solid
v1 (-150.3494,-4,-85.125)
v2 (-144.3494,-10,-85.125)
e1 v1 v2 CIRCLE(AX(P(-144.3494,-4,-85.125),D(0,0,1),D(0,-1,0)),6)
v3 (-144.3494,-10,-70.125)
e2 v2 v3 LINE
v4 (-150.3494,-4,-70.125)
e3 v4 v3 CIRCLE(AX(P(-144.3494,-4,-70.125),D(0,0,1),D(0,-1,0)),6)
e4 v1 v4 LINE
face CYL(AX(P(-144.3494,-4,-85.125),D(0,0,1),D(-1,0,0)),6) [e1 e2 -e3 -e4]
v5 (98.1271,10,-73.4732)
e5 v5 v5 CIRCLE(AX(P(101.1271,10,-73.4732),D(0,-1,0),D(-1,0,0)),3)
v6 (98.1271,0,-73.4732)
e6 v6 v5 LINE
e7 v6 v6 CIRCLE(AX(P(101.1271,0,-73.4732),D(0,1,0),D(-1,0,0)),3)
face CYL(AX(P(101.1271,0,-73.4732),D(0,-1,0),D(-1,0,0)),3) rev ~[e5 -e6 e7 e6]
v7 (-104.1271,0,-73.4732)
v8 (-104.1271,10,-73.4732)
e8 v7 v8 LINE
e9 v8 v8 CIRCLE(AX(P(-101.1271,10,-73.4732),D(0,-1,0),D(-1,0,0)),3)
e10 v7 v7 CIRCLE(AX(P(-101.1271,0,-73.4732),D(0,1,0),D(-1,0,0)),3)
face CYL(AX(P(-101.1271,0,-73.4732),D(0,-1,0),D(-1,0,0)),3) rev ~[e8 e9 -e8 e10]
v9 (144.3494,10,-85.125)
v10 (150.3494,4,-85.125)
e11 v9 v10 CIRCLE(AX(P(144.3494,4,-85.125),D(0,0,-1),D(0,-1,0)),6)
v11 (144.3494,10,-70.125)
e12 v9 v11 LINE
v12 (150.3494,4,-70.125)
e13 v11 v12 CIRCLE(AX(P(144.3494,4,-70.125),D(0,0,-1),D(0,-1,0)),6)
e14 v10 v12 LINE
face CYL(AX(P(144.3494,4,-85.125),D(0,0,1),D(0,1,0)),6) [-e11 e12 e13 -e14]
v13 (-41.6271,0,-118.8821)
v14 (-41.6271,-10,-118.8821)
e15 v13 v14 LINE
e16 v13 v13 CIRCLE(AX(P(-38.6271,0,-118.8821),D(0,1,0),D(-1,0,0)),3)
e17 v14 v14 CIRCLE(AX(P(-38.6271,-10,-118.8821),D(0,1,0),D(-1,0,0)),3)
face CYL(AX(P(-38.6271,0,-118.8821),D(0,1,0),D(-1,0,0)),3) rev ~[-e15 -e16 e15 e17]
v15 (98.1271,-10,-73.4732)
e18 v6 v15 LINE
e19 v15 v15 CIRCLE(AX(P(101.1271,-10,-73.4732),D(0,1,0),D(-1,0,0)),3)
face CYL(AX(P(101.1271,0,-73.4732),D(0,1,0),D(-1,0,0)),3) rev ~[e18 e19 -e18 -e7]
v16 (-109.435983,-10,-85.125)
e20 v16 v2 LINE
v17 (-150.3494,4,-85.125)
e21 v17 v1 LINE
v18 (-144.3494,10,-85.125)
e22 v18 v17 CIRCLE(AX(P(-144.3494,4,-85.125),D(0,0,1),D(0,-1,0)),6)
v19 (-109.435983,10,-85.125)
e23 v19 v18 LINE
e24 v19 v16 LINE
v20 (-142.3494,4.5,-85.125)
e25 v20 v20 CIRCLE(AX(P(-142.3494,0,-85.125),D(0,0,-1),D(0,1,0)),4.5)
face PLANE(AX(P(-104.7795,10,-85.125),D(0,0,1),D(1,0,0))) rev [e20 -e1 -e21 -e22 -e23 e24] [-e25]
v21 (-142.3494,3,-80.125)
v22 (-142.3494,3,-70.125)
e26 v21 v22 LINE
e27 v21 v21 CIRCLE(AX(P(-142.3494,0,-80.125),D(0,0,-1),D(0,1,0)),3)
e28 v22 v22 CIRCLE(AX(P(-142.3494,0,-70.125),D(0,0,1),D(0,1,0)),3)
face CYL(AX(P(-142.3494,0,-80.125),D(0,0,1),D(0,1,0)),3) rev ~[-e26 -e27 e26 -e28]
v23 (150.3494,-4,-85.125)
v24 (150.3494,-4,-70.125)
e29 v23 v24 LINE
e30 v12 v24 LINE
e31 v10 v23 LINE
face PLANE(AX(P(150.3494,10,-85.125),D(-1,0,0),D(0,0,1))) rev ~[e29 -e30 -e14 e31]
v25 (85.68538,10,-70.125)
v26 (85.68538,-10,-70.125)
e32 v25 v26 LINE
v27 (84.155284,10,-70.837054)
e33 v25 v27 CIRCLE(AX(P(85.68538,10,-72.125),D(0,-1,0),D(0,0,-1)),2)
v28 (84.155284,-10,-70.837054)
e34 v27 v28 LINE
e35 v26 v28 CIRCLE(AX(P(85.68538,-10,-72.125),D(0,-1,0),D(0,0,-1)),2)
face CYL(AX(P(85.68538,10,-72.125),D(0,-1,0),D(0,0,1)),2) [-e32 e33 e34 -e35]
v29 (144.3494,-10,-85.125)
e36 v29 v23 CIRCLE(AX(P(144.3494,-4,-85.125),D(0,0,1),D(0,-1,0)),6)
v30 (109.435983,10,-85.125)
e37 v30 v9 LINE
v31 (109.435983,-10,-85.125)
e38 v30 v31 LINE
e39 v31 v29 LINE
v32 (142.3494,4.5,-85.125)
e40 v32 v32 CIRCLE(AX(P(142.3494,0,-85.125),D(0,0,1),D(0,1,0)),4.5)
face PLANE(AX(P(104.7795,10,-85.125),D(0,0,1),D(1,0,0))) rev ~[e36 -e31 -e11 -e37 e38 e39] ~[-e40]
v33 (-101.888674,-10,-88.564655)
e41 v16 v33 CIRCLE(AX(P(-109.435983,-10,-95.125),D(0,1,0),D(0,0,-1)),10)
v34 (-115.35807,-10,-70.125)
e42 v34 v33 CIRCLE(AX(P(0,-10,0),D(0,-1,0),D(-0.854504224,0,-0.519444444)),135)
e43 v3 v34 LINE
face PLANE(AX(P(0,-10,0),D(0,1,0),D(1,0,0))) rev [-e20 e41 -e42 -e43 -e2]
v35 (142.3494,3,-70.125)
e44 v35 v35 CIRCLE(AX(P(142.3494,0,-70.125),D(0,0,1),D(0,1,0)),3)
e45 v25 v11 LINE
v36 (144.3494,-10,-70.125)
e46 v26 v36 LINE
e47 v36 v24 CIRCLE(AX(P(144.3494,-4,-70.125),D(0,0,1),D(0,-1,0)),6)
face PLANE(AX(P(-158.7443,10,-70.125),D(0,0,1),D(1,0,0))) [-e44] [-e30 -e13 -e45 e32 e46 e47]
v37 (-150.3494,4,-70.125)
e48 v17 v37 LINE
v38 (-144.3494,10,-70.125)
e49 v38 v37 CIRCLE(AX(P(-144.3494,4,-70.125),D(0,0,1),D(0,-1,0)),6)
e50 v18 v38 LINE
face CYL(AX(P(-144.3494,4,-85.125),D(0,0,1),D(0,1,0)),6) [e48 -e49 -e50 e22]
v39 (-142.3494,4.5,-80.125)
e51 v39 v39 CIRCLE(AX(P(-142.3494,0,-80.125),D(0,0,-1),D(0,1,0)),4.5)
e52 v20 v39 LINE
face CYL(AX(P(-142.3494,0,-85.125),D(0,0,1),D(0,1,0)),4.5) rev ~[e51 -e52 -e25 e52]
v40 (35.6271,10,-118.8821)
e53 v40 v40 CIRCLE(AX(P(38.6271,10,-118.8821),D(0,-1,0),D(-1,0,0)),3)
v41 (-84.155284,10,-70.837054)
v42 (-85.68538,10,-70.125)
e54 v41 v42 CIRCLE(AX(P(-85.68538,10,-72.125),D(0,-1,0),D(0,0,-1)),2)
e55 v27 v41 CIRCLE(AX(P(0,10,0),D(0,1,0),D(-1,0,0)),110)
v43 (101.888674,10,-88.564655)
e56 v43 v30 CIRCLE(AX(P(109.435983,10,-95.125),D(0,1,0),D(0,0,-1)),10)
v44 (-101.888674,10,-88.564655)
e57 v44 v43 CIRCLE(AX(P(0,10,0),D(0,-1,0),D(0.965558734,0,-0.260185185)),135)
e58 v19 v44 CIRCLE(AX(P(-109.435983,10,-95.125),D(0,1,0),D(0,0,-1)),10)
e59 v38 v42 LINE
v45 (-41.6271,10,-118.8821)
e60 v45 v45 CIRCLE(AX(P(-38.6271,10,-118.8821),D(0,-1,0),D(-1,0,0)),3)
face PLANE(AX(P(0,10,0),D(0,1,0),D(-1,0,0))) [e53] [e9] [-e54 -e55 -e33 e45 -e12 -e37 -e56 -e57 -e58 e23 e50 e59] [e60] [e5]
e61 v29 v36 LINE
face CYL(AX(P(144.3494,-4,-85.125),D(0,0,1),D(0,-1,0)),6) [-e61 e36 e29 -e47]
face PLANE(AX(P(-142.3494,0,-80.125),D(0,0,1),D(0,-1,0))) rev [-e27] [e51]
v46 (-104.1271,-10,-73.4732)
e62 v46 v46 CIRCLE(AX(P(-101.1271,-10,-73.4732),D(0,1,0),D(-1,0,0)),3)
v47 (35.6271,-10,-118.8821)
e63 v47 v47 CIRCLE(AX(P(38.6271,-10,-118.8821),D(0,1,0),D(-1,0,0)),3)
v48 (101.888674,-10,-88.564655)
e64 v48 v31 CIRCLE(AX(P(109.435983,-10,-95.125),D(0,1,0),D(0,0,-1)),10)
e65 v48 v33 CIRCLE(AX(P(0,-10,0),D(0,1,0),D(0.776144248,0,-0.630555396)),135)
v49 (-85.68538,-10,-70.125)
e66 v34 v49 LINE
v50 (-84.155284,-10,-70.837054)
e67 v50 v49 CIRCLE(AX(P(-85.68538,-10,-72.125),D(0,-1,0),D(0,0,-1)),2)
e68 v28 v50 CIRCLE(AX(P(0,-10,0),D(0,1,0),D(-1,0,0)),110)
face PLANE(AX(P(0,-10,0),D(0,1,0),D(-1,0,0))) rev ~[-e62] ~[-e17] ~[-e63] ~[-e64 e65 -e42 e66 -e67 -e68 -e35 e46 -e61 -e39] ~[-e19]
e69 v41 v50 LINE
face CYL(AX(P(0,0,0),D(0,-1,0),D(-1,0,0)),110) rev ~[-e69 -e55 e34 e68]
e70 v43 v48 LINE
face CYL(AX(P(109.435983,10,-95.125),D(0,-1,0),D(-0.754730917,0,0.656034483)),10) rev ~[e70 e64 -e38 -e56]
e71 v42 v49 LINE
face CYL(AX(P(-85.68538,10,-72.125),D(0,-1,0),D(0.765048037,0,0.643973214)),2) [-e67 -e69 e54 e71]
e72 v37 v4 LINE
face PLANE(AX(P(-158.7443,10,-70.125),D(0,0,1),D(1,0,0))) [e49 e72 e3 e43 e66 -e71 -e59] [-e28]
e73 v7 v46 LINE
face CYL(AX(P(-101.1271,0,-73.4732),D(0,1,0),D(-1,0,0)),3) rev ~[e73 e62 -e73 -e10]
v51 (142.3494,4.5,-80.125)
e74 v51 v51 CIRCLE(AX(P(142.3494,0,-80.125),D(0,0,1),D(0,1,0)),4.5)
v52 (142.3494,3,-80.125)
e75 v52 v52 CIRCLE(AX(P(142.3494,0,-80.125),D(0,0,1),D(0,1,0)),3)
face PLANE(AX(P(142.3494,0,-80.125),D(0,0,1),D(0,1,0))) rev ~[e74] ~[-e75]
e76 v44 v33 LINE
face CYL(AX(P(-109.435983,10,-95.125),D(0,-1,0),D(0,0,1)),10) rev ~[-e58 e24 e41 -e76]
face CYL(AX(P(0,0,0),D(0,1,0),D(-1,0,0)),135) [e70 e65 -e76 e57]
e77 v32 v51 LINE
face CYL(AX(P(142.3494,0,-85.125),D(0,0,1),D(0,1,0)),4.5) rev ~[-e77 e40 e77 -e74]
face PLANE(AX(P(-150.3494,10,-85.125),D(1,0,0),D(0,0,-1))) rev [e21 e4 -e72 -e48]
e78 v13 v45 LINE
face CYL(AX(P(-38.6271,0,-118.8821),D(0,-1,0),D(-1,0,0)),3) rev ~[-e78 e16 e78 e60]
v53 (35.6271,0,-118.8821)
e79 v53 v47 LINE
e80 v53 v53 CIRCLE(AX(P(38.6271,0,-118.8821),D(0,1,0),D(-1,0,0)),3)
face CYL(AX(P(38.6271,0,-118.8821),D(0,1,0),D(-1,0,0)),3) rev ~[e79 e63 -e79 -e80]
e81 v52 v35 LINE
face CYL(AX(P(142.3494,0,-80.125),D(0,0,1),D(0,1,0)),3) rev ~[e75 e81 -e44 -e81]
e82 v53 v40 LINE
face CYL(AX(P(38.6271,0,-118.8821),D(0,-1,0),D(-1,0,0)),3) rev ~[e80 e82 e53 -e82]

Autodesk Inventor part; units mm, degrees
ref_plane "YZ Plane" through (0, 0, 0) normal (1, 0, 0) x (0, 1, 0)
ref_plane "XZ Plane" through (0, 0, 0) normal (0, 1, 0) x (-1, 0, 0)
ref_plane "XY Plane" through (0, 0, 0) normal (0, 0, 1) x (1, 0, 0)
sketch "Sketch1" plane through (0, 0, 0) normal (0, 1, 0) x (-1, 0, 0)
  circle A0 centre (0, 0) radius 135
  circle A1 centre (0, 0) radius 110
  circle A2 centre (0, 0) radius 125
  circle A3 centre (-125, 0) radius 3
  circle A4 centre (-101.1271, -73.4732) radius 3
  circle A5 centre (-38.6271, -118.8821) radius 3
  circle A6 centre (38.6271, -118.8821) radius 3
  circle A7 centre (101.1271, -73.4732) radius 3
  circle A8 centre (125, 0) radius 3
  circle A9 centre (101.1271, 73.4732) radius 3
  circle A10 centre (38.6271, 118.8821) radius 3
  circle A11 centre (-38.6271, 118.8821) radius 3
  circle A12 centre (-101.1271, 73.4732) radius 3
  dimension "d69" = 250
  dimension "d0" = 270
  dimension "d1" = 220
  dimension "d75" = 6
  dimension "d78" = 360
extrude "Extrusion1" add sketch "Sketch1" along normal mid plane 20 contours A0 | A8 A2 A7 A6 A5 A4 A3 A12 A11 A10 A9
sketch "Sketch4" plane through (0, 10, 0) normal (0, 1, 0) x (1, 0, 0)
  circle A0 centre (0, 0) radius 50.125
  circle A1 centre (0, 0) radius 135 projected
  circle A2 centre (0, 0) radius 110 projected
  line L0 (125.3494, 50.125) -> (150.3494, 50.125)
  line L1 (150.3494, 50.125) -> (150.3494, 35.125)
  line L2 (150.3494, 35.125) -> (125.3494, 35.125)
  line L3 (125.3494, 35.125) -> (125.3494, 50.125)
  line L4 (150.3494, 70.125) -> (104.7795, 70.125)
  line L5 (104.7795, 70.125) -> (104.7795, 85.125)
  line L6 (104.7795, 85.125) -> (150.3494, 85.125)
  line L7 (150.3494, 85.125) -> (150.3494, 70.125)
  line L8 (103.1497, 60.125) -> (138.3886, 60.125) construction
  point P0 (130.3504, 35.125)
  point P1 (115.3581, 70.125)
  dimension "d21" = 100.25
  dimension "d22" = 25
  dimension "d23" = 15
  dimension "d24" = 20
  dimension "d25" = 15
  dimension "d57" = 10
extrude "Extrusion3" add sketch "Sketch4" against normal up to surface (20 mm away) contours L6 L7 L4 A1 | A1 L0 L1 L2
fillet "Fillet1" radius 6 4 edges at (150.3494, 10, -77.625) (150.3494, -10, -77.625) (150.3494, -10, -42.625) (150.3494, 10, -42.625)
fillet "Fillet2" radius 10 1 edges at (104.7795, 0, -85.125)
fillet "Fillet3" radius 2 1 edges at (130.3504, 0, -35.125)
sketch "Sketch5" plane through (150.3494, -4, -85.125) normal (0, 0, -1) x (-1, 0, 0)
  line L0 (0, 8) -> (0, 0) projected
  line L1 (40.9135, -6) -> (6, -6) projected
  point P0 (150.3494, 4)
  point P1 (8, 4)
  point P2 (0, 4)
  dimension "d38" = 8
  dimension "d39" = 10
hole "Hole2" at (142.3494, 0, -85.125) direction (0, 0, 1) diameter 6 depth 50 counterbore diameter 9 counterbore depth 5
mirror "Mirror1" about plane through (0, 0, 0) normal (1, 0, 0) of "Extrusion3", "Fillet1", "Fillet2", "Fillet3", "Hole2"
mirror "Mirror2" about plane through (0, 0, 0) normal (0, 0, 1) of "Extrusion3", "Fillet1", "Fillet2", "Fillet3", "Hole2"
sketch "Sketch7" plane through (0, 10, 0) normal (0, 1, 0) x (1, 0, 0)
  line L0 (0, 0) -> (0, -158.0698) construction
  point P0 (0, -127.5)
  dimension "d50" = 127.5
hole "Hole3" at (0, 10, 127.5) direction (0, -1, 0) diameter 5 end through all
sketch "Sketch11" plane through (0, 10, 0) normal (0, 1, 0) x (1, 0, 0)
  line L0 (-158.7443, 70.125) -> (165.1324, 70.125)
  line L1 (165.1324, 70.125) -> (165.1324, -140.5382)
  line L2 (165.1324, -140.5382) -> (-158.7443, -140.5382)
  line L3 (-158.7443, -140.5382) -> (-158.7443, 70.125)
  point P0 (0, 0)
extrude "Extrusion7" cut sketch "Sketch11" against normal through all
fillet "Fillet7" radius 2 2 edges at (-84.7495, 0, -70.125) (84.7495, 0, -70.125)
properties part number "Cylinder 80-20 Spacer_2"
